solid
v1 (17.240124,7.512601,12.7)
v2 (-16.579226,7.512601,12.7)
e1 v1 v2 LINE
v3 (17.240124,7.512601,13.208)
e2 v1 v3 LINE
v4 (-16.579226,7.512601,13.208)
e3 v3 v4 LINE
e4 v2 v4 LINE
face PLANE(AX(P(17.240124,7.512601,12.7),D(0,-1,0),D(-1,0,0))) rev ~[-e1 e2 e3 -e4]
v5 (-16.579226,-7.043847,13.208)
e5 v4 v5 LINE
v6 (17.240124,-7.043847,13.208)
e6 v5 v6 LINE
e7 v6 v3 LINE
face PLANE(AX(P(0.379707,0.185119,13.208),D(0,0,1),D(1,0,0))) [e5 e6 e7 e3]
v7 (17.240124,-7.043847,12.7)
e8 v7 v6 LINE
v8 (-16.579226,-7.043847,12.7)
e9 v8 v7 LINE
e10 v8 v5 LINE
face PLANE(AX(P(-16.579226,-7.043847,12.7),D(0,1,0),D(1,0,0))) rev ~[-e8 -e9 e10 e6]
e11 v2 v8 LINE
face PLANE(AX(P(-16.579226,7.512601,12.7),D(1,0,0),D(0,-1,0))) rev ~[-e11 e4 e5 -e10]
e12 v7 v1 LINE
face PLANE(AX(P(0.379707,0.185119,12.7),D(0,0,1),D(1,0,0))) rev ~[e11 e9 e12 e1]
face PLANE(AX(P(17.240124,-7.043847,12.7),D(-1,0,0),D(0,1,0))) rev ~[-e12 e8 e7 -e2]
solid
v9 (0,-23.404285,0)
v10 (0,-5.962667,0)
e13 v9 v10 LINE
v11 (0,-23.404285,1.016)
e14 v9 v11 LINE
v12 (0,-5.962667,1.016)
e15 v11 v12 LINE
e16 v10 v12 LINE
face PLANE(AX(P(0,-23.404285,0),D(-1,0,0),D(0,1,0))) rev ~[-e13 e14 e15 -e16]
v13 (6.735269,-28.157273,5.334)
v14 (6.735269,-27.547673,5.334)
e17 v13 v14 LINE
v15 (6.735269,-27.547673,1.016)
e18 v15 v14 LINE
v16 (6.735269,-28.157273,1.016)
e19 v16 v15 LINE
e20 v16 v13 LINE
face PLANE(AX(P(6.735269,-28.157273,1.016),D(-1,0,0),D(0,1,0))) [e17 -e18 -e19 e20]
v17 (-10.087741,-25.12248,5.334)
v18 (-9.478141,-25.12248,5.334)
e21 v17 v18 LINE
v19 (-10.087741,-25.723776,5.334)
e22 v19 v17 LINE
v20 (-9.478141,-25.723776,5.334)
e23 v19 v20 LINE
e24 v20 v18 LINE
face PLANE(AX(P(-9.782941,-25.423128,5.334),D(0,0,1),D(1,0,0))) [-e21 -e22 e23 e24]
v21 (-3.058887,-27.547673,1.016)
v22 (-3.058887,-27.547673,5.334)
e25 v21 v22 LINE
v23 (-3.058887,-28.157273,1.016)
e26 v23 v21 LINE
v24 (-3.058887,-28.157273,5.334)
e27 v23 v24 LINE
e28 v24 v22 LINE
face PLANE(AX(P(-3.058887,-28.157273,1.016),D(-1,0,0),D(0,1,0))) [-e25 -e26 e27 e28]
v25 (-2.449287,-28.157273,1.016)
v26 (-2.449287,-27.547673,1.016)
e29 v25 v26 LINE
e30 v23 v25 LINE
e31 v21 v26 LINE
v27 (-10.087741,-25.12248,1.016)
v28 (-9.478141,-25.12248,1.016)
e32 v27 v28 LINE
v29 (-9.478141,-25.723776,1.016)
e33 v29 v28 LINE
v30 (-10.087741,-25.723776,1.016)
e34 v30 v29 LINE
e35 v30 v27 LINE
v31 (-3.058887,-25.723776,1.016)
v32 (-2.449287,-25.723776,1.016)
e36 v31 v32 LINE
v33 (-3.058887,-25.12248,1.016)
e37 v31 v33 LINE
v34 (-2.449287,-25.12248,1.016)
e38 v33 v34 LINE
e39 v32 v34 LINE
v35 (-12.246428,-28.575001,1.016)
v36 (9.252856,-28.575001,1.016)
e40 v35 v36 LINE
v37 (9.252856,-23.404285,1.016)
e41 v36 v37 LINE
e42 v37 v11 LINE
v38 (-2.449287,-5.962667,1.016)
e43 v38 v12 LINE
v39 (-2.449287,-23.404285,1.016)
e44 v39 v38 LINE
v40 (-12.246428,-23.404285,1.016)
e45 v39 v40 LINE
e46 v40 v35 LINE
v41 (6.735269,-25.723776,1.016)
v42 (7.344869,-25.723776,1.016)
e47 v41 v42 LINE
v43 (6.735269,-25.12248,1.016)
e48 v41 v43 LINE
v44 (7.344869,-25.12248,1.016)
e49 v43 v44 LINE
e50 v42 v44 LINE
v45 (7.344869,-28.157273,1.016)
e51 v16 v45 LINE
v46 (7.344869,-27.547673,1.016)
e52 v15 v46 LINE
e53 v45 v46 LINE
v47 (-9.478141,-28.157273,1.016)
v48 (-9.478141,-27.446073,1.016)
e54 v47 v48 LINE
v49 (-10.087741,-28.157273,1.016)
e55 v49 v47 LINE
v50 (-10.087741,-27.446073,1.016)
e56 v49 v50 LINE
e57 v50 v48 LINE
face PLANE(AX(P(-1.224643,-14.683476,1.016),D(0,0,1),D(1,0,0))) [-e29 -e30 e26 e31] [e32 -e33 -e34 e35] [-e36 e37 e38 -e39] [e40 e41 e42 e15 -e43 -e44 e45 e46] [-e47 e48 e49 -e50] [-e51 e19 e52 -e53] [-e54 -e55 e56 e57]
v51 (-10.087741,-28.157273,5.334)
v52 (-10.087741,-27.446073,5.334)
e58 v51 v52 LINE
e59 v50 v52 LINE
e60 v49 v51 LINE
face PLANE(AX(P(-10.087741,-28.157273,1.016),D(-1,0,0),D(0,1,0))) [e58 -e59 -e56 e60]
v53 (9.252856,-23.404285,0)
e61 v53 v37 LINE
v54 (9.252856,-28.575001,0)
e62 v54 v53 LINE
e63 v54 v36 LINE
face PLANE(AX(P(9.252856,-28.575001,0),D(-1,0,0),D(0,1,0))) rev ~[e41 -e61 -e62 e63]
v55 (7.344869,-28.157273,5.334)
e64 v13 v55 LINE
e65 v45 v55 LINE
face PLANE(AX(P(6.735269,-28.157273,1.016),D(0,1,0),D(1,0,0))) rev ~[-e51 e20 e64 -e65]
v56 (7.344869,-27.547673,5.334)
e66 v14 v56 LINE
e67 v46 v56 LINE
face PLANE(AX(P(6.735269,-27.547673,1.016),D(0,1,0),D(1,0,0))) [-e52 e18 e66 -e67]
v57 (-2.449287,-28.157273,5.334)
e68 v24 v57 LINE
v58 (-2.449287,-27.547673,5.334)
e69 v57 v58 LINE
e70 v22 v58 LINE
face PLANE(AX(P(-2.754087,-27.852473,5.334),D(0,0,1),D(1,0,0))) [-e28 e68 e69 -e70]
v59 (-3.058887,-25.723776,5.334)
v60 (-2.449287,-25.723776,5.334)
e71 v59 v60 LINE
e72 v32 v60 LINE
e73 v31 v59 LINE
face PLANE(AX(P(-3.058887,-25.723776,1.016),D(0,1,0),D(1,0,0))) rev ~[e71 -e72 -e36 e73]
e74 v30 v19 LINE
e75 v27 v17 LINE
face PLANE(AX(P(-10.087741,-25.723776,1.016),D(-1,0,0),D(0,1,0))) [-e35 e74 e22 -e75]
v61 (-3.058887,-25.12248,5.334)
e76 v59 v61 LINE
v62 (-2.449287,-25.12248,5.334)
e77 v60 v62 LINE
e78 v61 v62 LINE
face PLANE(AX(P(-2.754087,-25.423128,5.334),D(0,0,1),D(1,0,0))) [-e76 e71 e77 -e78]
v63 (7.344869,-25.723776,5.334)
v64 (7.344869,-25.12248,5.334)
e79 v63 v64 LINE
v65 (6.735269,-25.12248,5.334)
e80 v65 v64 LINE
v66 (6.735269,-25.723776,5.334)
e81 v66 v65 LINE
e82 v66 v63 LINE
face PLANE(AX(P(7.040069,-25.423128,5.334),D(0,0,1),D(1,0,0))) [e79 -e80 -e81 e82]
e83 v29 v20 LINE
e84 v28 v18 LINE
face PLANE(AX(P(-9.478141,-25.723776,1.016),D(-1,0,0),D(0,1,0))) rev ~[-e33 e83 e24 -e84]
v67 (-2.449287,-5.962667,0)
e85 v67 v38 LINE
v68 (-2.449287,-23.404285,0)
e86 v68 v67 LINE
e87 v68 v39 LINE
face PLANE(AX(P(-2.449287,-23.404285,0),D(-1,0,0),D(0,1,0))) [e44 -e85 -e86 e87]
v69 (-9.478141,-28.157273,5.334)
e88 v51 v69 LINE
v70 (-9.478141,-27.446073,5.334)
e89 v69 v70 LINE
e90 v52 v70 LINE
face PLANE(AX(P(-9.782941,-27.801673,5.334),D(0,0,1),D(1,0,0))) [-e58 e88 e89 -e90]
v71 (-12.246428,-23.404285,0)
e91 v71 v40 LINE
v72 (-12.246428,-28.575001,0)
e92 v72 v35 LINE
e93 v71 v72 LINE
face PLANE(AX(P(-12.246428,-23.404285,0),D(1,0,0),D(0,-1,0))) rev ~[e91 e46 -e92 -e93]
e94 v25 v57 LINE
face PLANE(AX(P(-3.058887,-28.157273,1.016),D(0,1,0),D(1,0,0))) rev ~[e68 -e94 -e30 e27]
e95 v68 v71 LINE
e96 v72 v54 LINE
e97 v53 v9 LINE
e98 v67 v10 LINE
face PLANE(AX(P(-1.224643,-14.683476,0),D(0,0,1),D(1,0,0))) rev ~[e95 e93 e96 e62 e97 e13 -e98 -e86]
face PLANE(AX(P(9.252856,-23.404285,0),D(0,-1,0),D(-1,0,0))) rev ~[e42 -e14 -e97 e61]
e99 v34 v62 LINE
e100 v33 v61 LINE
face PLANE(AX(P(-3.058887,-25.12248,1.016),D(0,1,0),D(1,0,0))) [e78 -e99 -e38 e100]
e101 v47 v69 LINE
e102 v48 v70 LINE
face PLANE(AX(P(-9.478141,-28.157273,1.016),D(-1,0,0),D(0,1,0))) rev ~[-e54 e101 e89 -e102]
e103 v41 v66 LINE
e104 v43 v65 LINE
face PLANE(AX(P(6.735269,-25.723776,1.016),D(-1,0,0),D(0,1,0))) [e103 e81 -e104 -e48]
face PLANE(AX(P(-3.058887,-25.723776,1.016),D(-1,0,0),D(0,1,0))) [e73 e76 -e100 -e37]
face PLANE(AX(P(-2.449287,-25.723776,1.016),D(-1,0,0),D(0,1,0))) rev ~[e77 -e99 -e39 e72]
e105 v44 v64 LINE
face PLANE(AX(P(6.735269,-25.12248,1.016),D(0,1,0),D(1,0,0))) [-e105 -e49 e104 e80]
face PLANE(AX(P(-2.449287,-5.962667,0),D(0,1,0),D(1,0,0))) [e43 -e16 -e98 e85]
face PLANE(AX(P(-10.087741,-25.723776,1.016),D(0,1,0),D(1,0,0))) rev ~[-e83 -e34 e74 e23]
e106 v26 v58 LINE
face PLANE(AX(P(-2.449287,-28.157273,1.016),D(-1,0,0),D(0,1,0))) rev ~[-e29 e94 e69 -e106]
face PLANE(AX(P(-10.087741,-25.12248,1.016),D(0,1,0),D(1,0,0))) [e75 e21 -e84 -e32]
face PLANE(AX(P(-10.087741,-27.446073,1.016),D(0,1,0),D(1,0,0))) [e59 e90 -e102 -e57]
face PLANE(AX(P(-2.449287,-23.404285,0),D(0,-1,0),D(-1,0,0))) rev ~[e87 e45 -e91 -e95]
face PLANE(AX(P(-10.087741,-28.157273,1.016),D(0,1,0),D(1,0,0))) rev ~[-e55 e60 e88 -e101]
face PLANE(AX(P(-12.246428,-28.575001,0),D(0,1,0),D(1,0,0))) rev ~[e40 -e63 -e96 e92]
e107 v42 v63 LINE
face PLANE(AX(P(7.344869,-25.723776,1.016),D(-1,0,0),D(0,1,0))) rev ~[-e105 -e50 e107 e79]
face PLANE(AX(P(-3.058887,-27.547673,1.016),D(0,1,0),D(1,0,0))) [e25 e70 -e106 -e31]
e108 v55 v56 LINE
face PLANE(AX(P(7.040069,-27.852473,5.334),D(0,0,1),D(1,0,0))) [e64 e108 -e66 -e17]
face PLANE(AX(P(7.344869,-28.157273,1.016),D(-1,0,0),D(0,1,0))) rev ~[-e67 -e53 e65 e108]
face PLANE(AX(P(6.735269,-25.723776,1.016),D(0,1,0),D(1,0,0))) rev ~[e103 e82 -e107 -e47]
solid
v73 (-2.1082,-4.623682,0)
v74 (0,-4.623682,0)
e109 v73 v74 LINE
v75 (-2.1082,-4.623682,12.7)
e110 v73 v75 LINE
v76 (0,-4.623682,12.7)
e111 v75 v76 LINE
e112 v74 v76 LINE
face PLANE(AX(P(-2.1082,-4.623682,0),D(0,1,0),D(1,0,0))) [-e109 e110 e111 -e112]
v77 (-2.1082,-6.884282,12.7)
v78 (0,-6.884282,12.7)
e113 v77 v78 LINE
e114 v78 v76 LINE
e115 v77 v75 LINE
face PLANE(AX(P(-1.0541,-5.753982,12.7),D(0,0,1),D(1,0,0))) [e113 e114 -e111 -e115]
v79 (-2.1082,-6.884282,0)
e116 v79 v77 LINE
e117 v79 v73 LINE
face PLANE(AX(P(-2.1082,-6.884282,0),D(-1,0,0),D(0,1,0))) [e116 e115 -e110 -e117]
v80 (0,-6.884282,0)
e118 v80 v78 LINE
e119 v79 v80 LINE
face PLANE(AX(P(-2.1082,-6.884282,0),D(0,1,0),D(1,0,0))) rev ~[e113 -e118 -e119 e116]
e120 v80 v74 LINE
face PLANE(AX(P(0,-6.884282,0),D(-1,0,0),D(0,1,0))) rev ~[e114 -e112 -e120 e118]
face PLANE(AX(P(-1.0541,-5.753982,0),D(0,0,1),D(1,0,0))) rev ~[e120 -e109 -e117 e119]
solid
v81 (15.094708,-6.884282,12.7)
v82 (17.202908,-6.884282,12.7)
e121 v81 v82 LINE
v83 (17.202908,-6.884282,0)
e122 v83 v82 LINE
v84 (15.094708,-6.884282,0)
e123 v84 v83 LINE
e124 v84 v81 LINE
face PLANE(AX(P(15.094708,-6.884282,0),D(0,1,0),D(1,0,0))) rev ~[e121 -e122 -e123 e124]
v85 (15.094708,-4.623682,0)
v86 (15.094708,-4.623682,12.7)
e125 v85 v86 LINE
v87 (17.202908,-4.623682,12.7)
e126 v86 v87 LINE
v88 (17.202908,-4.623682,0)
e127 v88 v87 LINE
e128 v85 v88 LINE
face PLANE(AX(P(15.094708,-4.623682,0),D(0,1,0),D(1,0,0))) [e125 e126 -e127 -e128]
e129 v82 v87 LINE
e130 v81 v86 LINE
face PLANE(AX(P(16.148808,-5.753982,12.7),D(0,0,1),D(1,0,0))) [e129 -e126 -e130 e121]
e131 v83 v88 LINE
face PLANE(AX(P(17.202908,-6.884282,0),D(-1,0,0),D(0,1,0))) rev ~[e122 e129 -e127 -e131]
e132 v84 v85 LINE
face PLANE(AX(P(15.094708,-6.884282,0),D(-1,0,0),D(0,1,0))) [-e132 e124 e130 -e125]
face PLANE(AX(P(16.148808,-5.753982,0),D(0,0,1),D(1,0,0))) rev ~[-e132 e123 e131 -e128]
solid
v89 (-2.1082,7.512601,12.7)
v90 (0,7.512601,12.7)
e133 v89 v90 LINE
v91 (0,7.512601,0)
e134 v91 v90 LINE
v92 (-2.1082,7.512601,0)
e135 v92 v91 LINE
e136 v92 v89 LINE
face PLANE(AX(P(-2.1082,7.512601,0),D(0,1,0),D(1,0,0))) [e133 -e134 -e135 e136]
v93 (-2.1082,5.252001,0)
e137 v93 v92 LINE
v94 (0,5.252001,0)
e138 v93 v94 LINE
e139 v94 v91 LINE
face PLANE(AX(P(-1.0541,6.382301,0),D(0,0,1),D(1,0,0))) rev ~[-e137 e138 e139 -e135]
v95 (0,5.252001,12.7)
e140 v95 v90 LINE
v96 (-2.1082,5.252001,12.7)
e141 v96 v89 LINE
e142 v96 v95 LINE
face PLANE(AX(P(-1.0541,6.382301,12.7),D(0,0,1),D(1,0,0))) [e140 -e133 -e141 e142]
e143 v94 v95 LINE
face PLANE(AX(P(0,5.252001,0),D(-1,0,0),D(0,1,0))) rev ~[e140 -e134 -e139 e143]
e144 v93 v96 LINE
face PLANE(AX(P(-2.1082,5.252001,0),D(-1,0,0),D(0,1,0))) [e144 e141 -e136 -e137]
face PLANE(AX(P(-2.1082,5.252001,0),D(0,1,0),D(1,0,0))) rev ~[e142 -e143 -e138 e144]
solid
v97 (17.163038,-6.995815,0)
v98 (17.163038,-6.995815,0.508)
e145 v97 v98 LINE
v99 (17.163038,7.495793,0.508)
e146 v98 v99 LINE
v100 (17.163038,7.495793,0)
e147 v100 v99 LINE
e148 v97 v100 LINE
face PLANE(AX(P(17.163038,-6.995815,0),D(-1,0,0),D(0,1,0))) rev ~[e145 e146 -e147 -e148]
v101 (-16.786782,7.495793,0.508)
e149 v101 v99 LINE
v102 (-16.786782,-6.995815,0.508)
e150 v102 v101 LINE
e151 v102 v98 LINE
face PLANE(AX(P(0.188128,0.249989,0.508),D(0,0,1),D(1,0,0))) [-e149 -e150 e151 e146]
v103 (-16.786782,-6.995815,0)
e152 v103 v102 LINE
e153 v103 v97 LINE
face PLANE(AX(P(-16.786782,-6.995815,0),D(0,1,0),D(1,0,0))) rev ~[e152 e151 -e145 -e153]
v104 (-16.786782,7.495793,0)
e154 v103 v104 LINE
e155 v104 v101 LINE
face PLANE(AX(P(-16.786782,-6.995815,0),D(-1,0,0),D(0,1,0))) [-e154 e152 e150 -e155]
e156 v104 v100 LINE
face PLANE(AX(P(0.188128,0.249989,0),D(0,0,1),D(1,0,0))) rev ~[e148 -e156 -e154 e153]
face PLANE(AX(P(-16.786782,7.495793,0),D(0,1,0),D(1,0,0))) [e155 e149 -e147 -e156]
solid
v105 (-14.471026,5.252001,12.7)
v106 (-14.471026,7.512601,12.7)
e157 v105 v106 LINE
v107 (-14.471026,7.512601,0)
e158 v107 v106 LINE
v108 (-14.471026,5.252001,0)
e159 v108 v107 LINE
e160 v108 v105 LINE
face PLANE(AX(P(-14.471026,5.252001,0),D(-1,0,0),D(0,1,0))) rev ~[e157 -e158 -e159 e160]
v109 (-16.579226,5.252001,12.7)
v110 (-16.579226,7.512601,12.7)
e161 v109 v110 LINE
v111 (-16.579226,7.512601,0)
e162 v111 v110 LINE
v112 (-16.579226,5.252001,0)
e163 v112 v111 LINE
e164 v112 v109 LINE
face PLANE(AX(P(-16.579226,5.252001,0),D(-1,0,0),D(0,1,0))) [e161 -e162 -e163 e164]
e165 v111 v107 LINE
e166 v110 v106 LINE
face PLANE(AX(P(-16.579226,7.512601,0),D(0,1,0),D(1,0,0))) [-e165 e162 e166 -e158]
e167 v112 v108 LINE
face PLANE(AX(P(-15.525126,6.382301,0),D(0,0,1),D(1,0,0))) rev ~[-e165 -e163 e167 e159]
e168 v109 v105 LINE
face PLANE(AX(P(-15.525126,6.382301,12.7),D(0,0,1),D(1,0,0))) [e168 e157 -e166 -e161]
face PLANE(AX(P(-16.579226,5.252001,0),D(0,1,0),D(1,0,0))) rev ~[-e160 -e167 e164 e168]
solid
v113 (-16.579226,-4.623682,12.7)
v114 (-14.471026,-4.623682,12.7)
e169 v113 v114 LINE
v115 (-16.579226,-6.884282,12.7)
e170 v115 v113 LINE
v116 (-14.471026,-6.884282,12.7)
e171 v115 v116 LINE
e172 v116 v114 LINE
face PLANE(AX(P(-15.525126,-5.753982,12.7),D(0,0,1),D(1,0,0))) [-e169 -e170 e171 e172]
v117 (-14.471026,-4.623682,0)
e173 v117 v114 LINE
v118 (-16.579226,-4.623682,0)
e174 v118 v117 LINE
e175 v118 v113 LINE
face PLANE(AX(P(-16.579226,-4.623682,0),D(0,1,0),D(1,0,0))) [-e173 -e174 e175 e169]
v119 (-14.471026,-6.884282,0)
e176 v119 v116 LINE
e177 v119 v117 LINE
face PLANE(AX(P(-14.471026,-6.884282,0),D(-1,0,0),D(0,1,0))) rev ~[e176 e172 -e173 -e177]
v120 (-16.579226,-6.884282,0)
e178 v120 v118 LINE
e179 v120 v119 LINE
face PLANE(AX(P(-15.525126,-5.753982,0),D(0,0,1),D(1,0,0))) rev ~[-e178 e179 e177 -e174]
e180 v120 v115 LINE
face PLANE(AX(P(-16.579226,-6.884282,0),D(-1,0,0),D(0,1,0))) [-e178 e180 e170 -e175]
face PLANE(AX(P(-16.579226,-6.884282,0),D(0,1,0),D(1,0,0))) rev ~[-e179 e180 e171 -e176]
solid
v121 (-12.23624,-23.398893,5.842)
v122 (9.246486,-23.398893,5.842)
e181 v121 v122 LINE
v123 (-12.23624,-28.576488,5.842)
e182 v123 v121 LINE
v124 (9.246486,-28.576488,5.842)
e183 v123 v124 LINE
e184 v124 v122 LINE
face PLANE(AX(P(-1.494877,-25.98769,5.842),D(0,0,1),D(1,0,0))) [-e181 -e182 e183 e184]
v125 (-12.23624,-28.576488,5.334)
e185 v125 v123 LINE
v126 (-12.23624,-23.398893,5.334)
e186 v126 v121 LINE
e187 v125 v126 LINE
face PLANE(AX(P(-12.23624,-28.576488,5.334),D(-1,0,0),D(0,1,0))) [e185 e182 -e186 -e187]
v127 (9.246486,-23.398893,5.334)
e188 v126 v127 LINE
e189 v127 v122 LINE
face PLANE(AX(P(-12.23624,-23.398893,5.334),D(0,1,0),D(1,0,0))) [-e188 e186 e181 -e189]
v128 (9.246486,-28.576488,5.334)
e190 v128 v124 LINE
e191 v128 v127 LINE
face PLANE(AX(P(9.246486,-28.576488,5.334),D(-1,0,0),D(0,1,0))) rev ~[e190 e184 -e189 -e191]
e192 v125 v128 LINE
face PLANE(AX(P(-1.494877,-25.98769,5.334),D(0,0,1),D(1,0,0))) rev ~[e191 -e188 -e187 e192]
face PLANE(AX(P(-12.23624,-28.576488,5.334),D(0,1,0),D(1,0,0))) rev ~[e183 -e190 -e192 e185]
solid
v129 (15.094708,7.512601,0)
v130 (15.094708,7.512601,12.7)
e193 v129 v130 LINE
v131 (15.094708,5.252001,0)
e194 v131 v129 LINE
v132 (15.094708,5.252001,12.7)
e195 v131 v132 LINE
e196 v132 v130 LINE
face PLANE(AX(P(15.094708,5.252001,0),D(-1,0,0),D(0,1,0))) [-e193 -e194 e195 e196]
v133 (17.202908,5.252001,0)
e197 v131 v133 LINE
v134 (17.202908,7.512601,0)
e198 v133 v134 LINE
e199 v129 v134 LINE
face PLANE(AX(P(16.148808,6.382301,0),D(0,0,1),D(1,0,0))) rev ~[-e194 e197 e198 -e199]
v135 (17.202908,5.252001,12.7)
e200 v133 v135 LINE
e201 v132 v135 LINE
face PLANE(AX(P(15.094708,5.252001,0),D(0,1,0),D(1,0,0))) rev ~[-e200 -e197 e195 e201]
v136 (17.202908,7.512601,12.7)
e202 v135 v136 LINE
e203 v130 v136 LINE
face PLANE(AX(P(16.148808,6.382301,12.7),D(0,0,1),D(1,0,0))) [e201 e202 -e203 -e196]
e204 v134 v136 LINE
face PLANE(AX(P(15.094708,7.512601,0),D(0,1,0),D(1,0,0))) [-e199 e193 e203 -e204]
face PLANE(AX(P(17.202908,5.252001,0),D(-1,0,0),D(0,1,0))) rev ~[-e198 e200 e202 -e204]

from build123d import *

# Parameters (mm, degrees)
F1_W      = 2.1082
F1_H      = 2.2606
F2_DEPTH  = 12.7
F0_W      = 2.4492868688
F0_H      = 17.4416182563
F3_DEPTH  = 1.016
F4_W      = 0.6096
F4_H      = 0.6012953818
F4_H_2    = 0.7112
F4_H_3    = 0.6096
F5_DEPTH  = 4.318
F6_W      = 21.482726559
F6_H      = 5.1775947213
F6_W_2    = 0.6096
F6_H_2    = 0.6012953818
F7_DEPTH  = 0.508
F8_W      = 33.9498203248
F8_H      = 14.4916079007
F9_DEPTH  = 0.508
F10_W     = 2.1082
F10_H     = 2.2606
F11_DEPTH = 0.508


# Not quite as in the source:
# - a feature names something its author has since deleted; it is built from what else it names


with BuildPart() as f2:
    # F1 (on Top) → F2 (new body)
    with BuildSketch(Plane.XY):
        with Locations((-15.5251261375, 6.3823008758)):
            Rectangle(F1_W, F1_H)
    extrude(amount=F2_DEPTH)


with BuildPart() as f2b:
    # F1 (on Top) → F2, piece 2 (new body)
    with BuildSketch(Plane.XY):
        with Locations((-15.5251261375, -5.7539824548)):
            Rectangle(F1_W, F1_H)
    extrude(amount=F2_DEPTH)


with BuildPart() as f2c:
    # F1 (on Top) → F2, piece 3 (new body)
    with BuildSketch(Plane.XY):
        with Locations((-1.0541, 6.3823008758)):
            Rectangle(F1_W, F1_H)
    extrude(amount=F2_DEPTH)


with BuildPart() as f2d:
    # F1 (on Top) → F2, piece 4 (new body)
    with BuildSketch(Plane.XY):
        with Locations((-1.0541, -5.7539824548)):
            Rectangle(F1_W, F1_H)
    extrude(amount=F2_DEPTH)


with BuildPart() as f2e:
    # F1 (on Top) → F2, piece 5 (new body)
    with BuildSketch(Plane.XY):
        with Locations((16.14880772, 6.3823008758)):
            Rectangle(F1_W, F1_H)
    extrude(amount=F2_DEPTH)


with BuildPart() as f2f:
    # F1 (on Top) → F2, piece 6 (new body)
    with BuildSketch(Plane.XY):
        with Locations((16.14880772, -5.7539824548)):
            Rectangle(F1_W, F1_H)
    extrude(amount=F2_DEPTH)


with BuildPart() as f3:
    # F0 (on Top) → F3 (new body)
    with BuildSketch(Plane.XY):
        with Locations((-1.2246434344, -14.6834761836)):
            Rectangle(F0_W, F0_H)
        Polygon((9.2528564855, -23.4042853117), (0, -23.4042853117), (-2.4492868688, -23.4042853117), (-12.2464280576, -23.4042853117), (-12.2464280576, -28.5750012845), (9.2528564855, -28.5750012845), align=None)
    extrude(amount=F3_DEPTH)

    # F4 (on face) → F5 (join)
    with BuildSketch(Plane.XY.offset(1.016)):
        with Locations((-9.7829406224, -25.4231281579)):
            Rectangle(F4_W, F4_H)
        with Locations((-9.7829406224, -27.8016733074)):
            Rectangle(F4_W, F4_H_2)
        with Locations((-2.7540868688, -25.4231281579)):
            Rectangle(F4_W, F4_H)
        with Locations((-2.7540868688, -27.8524733074)):
            Rectangle(F4_W, F4_H_3)
        with Locations((7.0400689803, -25.4231281579)):
            Rectangle(F4_W, F4_H)
        with Locations((7.0400689803, -27.8524733074)):
            Rectangle(F4_W, F4_H_3)
    extrude(amount=F5_DEPTH)


with BuildPart() as f7:
    # F6 (on face) → F7 (new body)
    with BuildSketch(Plane.XY.offset(5.334)):
        with Locations((-1.4948770404, -25.9876903147)):
            Rectangle(F6_W, F6_H)
        with Locations((-9.7829406224, -25.4231281579)):
            Rectangle(F6_W_2, F6_H_2, mode=Mode.SUBTRACT)
        with Locations((-9.7829406224, -25.4231281579)):
            Rectangle(F6_W_2, F6_H_2)
    extrude(amount=F7_DEPTH)


with BuildPart() as f9:
    # F8 (on Top) → F9 (new body)
    with BuildSketch(Plane.XY):
        with Locations((0.1881280914, 0.2499890979)):
            Rectangle(F8_W, F8_H)
    extrude(amount=F9_DEPTH)


with BuildPart() as f11:
    # F10 (on face) → F11 (new body)
    with BuildSketch(Plane.XY.offset(12.7)):
        Polygon((17.2401238233, 7.5126008758), (-14.4710261375, 7.5126008758), (-14.4710261375, 5.2520008758), (-16.5792261375, 5.2520008758), (-16.5792261375, -7.0438468829), (17.2401238233, -7.0438468829), align=None)
        with Locations((-15.5251261375, 6.3823008758)):
            Rectangle(F10_W, F10_H)
    extrude(amount=F11_DEPTH)


solid = Compound([f2.part, f2b.part, f2c.part, f2d.part, f2e.part, f2f.part, f3.part, f7.part, f9.part, f11.part])
